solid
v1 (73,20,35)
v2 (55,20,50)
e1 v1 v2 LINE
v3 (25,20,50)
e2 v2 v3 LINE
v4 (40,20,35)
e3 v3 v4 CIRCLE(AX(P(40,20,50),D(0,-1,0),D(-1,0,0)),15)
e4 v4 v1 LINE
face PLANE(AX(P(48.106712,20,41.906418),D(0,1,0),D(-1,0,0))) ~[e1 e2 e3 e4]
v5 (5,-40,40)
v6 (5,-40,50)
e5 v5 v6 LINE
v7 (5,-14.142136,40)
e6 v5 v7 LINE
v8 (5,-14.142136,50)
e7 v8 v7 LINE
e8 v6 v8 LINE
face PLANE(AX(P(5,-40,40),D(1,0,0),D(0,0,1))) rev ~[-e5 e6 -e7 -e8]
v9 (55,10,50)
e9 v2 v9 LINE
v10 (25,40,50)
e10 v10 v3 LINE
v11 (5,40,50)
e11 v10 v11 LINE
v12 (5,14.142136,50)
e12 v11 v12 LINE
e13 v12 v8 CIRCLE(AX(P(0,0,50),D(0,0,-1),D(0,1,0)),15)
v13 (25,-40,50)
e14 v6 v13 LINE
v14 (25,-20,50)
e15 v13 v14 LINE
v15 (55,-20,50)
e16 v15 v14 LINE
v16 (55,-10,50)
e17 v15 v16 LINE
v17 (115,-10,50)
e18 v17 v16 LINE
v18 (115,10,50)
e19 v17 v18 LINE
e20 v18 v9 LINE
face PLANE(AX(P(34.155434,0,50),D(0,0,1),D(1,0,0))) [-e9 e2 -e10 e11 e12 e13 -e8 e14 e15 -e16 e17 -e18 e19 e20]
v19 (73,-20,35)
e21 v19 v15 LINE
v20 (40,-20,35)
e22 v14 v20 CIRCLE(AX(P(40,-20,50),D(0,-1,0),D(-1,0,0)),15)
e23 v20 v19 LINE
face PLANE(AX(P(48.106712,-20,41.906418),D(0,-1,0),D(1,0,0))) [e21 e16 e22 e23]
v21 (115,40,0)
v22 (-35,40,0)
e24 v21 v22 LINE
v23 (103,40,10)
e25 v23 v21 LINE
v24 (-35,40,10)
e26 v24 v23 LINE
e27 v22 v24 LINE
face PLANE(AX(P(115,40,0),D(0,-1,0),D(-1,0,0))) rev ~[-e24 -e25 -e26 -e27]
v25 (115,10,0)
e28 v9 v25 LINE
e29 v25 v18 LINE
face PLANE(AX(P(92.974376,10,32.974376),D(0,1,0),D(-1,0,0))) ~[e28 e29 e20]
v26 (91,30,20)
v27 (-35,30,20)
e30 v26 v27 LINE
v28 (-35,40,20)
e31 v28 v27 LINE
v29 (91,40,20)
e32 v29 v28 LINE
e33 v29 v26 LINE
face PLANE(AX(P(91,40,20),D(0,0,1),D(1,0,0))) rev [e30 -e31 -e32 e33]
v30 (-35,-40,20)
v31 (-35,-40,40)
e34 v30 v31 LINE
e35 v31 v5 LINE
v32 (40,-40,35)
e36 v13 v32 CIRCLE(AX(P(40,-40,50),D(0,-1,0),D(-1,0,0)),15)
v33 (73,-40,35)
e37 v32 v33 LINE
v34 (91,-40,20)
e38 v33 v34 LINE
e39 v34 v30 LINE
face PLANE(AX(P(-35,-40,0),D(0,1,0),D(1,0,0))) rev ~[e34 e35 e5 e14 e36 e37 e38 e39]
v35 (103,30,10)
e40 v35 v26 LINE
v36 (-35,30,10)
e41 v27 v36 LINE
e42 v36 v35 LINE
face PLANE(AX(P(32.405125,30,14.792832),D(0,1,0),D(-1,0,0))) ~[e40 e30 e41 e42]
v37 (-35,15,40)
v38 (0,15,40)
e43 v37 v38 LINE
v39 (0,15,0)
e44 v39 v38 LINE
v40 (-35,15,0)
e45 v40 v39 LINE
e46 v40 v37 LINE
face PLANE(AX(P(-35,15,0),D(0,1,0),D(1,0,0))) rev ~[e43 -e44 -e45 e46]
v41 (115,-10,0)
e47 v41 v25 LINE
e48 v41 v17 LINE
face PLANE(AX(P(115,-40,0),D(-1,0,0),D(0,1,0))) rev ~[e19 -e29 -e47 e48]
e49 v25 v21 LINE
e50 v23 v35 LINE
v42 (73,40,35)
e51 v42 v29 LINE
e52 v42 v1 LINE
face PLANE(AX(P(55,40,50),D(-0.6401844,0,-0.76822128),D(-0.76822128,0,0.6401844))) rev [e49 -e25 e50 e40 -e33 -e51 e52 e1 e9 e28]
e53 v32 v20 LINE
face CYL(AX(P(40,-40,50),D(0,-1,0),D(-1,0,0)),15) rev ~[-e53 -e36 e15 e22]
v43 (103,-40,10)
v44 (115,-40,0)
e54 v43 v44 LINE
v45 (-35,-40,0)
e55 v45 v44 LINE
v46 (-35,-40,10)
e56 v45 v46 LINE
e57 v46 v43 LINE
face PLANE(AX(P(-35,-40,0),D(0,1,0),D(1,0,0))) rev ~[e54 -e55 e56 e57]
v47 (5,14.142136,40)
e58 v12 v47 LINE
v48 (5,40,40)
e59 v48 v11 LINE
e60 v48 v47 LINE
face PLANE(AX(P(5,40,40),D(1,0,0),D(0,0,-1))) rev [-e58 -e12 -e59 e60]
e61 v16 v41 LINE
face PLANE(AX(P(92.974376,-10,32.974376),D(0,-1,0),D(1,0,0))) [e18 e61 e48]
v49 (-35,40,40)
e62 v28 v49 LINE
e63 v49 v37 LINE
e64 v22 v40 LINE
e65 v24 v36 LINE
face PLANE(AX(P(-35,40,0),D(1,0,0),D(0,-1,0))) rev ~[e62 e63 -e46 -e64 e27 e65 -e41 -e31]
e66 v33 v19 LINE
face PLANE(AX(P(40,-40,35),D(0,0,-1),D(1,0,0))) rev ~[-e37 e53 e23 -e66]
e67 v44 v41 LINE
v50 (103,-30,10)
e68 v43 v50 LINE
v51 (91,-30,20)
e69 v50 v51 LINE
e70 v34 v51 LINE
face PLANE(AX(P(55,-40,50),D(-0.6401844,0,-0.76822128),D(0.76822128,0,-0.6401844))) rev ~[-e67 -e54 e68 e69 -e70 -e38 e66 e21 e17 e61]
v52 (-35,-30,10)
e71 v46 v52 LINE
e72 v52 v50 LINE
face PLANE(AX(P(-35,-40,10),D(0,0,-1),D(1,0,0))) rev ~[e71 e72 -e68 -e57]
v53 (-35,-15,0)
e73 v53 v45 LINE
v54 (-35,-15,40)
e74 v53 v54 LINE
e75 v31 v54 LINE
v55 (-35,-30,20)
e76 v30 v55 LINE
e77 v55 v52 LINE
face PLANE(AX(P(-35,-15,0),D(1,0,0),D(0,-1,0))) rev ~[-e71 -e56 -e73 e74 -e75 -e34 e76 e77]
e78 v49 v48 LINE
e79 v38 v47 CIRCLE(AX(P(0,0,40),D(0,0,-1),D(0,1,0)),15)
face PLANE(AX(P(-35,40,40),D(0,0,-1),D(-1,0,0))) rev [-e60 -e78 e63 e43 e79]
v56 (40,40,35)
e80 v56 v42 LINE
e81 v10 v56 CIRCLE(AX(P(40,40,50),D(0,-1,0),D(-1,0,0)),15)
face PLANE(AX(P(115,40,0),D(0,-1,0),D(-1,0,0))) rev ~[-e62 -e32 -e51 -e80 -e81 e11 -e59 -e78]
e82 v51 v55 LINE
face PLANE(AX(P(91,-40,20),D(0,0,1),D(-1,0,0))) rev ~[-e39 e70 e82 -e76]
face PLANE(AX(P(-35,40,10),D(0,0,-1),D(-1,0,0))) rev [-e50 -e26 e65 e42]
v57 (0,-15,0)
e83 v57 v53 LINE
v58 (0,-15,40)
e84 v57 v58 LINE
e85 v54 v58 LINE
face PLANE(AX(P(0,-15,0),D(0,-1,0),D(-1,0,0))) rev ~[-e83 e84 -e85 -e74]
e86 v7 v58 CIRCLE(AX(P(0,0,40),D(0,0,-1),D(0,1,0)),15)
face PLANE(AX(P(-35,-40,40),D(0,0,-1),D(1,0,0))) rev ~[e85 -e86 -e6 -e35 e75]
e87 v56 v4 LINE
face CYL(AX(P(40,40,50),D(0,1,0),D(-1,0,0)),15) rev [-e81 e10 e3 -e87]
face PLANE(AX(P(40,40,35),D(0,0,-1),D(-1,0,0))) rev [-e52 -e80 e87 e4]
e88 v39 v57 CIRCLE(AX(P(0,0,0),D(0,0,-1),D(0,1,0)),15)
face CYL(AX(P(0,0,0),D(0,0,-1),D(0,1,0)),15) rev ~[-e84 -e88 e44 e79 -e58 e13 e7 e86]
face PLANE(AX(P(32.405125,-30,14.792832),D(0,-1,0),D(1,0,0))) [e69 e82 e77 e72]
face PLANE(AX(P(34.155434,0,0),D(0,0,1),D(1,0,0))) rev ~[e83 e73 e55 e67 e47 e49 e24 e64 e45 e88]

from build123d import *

# Parameters (mm, degrees)
F1_DEPTH = 50
F2_W     = 40
F2_H     = 10
F3_DEPTH = 30
F4_DEPTH = 10
F5_DEPTH = 20


# Not quite as in the source:
# - a pattern or mirror of a feature is missing from the dataset's text; its kind, count and spacing are read off the source's solid


with BuildPart() as f1:
    # F0 (on Top) → F1 (new body)
    with BuildSketch(Plane.XY):
        with BuildLine():
            Line((-35, -15), (-35, -40))
            Line((-35, -40), (115, -40))
            Line((115, -40), (115, 40))
            Line((115, 40), (-35, 40))
            Line((-35, 40), (-35, 15))
            Line((-35, 15), (0, 15))
            ThreePointArc((0, 15), (15, 0), (0, -15))
            Line((0, -15), (-35, -15))
        make_face()
    extrude(amount=F1_DEPTH)

    # F2 (on face) → F3 (cut)
    with BuildSketch(Plane.XZ.offset(40)):
        with Locations((-15, 45)):
            Rectangle(F2_W, F2_H)
        Polygon((115, 50), (55, 50), (73, 35), (91, 20), (103, 10), (115, 0), align=None)
    f3 = extrude(amount=-F3_DEPTH, mode=Mode.SUBTRACT)

    # F3_copies: F3 across plane
    add(f3.mirror(Plane.ZX), mode=Mode.SUBTRACT)

    # F2 (on face) → F4 (cut)
    with BuildSketch(Plane.XZ.offset(40)):
        Polygon((91, 20), (-35, 20), (-35, 10), (103, 10), align=None)
    f4 = extrude(amount=-F4_DEPTH, mode=Mode.SUBTRACT)

    # F4_copies: F4 across plane
    add(f4.mirror(Plane.ZX), mode=Mode.SUBTRACT)

    # F2 (on face) → F5 (cut)
    with BuildSketch(Plane.XZ.offset(40)):
        with BuildLine():
            Line((55, 50), (25, 50))
            ThreePointArc((25, 50), (29.3933982822, 39.3933982822), (40, 35))
            Line((40, 35), (73, 35))
            Line((73, 35), (55, 50))
        make_face()
    f5 = extrude(amount=-F5_DEPTH, mode=Mode.SUBTRACT)

    # F5_copies: F5 across plane
    add(f5.mirror(Plane.ZX), mode=Mode.SUBTRACT)


solid = f1.part
